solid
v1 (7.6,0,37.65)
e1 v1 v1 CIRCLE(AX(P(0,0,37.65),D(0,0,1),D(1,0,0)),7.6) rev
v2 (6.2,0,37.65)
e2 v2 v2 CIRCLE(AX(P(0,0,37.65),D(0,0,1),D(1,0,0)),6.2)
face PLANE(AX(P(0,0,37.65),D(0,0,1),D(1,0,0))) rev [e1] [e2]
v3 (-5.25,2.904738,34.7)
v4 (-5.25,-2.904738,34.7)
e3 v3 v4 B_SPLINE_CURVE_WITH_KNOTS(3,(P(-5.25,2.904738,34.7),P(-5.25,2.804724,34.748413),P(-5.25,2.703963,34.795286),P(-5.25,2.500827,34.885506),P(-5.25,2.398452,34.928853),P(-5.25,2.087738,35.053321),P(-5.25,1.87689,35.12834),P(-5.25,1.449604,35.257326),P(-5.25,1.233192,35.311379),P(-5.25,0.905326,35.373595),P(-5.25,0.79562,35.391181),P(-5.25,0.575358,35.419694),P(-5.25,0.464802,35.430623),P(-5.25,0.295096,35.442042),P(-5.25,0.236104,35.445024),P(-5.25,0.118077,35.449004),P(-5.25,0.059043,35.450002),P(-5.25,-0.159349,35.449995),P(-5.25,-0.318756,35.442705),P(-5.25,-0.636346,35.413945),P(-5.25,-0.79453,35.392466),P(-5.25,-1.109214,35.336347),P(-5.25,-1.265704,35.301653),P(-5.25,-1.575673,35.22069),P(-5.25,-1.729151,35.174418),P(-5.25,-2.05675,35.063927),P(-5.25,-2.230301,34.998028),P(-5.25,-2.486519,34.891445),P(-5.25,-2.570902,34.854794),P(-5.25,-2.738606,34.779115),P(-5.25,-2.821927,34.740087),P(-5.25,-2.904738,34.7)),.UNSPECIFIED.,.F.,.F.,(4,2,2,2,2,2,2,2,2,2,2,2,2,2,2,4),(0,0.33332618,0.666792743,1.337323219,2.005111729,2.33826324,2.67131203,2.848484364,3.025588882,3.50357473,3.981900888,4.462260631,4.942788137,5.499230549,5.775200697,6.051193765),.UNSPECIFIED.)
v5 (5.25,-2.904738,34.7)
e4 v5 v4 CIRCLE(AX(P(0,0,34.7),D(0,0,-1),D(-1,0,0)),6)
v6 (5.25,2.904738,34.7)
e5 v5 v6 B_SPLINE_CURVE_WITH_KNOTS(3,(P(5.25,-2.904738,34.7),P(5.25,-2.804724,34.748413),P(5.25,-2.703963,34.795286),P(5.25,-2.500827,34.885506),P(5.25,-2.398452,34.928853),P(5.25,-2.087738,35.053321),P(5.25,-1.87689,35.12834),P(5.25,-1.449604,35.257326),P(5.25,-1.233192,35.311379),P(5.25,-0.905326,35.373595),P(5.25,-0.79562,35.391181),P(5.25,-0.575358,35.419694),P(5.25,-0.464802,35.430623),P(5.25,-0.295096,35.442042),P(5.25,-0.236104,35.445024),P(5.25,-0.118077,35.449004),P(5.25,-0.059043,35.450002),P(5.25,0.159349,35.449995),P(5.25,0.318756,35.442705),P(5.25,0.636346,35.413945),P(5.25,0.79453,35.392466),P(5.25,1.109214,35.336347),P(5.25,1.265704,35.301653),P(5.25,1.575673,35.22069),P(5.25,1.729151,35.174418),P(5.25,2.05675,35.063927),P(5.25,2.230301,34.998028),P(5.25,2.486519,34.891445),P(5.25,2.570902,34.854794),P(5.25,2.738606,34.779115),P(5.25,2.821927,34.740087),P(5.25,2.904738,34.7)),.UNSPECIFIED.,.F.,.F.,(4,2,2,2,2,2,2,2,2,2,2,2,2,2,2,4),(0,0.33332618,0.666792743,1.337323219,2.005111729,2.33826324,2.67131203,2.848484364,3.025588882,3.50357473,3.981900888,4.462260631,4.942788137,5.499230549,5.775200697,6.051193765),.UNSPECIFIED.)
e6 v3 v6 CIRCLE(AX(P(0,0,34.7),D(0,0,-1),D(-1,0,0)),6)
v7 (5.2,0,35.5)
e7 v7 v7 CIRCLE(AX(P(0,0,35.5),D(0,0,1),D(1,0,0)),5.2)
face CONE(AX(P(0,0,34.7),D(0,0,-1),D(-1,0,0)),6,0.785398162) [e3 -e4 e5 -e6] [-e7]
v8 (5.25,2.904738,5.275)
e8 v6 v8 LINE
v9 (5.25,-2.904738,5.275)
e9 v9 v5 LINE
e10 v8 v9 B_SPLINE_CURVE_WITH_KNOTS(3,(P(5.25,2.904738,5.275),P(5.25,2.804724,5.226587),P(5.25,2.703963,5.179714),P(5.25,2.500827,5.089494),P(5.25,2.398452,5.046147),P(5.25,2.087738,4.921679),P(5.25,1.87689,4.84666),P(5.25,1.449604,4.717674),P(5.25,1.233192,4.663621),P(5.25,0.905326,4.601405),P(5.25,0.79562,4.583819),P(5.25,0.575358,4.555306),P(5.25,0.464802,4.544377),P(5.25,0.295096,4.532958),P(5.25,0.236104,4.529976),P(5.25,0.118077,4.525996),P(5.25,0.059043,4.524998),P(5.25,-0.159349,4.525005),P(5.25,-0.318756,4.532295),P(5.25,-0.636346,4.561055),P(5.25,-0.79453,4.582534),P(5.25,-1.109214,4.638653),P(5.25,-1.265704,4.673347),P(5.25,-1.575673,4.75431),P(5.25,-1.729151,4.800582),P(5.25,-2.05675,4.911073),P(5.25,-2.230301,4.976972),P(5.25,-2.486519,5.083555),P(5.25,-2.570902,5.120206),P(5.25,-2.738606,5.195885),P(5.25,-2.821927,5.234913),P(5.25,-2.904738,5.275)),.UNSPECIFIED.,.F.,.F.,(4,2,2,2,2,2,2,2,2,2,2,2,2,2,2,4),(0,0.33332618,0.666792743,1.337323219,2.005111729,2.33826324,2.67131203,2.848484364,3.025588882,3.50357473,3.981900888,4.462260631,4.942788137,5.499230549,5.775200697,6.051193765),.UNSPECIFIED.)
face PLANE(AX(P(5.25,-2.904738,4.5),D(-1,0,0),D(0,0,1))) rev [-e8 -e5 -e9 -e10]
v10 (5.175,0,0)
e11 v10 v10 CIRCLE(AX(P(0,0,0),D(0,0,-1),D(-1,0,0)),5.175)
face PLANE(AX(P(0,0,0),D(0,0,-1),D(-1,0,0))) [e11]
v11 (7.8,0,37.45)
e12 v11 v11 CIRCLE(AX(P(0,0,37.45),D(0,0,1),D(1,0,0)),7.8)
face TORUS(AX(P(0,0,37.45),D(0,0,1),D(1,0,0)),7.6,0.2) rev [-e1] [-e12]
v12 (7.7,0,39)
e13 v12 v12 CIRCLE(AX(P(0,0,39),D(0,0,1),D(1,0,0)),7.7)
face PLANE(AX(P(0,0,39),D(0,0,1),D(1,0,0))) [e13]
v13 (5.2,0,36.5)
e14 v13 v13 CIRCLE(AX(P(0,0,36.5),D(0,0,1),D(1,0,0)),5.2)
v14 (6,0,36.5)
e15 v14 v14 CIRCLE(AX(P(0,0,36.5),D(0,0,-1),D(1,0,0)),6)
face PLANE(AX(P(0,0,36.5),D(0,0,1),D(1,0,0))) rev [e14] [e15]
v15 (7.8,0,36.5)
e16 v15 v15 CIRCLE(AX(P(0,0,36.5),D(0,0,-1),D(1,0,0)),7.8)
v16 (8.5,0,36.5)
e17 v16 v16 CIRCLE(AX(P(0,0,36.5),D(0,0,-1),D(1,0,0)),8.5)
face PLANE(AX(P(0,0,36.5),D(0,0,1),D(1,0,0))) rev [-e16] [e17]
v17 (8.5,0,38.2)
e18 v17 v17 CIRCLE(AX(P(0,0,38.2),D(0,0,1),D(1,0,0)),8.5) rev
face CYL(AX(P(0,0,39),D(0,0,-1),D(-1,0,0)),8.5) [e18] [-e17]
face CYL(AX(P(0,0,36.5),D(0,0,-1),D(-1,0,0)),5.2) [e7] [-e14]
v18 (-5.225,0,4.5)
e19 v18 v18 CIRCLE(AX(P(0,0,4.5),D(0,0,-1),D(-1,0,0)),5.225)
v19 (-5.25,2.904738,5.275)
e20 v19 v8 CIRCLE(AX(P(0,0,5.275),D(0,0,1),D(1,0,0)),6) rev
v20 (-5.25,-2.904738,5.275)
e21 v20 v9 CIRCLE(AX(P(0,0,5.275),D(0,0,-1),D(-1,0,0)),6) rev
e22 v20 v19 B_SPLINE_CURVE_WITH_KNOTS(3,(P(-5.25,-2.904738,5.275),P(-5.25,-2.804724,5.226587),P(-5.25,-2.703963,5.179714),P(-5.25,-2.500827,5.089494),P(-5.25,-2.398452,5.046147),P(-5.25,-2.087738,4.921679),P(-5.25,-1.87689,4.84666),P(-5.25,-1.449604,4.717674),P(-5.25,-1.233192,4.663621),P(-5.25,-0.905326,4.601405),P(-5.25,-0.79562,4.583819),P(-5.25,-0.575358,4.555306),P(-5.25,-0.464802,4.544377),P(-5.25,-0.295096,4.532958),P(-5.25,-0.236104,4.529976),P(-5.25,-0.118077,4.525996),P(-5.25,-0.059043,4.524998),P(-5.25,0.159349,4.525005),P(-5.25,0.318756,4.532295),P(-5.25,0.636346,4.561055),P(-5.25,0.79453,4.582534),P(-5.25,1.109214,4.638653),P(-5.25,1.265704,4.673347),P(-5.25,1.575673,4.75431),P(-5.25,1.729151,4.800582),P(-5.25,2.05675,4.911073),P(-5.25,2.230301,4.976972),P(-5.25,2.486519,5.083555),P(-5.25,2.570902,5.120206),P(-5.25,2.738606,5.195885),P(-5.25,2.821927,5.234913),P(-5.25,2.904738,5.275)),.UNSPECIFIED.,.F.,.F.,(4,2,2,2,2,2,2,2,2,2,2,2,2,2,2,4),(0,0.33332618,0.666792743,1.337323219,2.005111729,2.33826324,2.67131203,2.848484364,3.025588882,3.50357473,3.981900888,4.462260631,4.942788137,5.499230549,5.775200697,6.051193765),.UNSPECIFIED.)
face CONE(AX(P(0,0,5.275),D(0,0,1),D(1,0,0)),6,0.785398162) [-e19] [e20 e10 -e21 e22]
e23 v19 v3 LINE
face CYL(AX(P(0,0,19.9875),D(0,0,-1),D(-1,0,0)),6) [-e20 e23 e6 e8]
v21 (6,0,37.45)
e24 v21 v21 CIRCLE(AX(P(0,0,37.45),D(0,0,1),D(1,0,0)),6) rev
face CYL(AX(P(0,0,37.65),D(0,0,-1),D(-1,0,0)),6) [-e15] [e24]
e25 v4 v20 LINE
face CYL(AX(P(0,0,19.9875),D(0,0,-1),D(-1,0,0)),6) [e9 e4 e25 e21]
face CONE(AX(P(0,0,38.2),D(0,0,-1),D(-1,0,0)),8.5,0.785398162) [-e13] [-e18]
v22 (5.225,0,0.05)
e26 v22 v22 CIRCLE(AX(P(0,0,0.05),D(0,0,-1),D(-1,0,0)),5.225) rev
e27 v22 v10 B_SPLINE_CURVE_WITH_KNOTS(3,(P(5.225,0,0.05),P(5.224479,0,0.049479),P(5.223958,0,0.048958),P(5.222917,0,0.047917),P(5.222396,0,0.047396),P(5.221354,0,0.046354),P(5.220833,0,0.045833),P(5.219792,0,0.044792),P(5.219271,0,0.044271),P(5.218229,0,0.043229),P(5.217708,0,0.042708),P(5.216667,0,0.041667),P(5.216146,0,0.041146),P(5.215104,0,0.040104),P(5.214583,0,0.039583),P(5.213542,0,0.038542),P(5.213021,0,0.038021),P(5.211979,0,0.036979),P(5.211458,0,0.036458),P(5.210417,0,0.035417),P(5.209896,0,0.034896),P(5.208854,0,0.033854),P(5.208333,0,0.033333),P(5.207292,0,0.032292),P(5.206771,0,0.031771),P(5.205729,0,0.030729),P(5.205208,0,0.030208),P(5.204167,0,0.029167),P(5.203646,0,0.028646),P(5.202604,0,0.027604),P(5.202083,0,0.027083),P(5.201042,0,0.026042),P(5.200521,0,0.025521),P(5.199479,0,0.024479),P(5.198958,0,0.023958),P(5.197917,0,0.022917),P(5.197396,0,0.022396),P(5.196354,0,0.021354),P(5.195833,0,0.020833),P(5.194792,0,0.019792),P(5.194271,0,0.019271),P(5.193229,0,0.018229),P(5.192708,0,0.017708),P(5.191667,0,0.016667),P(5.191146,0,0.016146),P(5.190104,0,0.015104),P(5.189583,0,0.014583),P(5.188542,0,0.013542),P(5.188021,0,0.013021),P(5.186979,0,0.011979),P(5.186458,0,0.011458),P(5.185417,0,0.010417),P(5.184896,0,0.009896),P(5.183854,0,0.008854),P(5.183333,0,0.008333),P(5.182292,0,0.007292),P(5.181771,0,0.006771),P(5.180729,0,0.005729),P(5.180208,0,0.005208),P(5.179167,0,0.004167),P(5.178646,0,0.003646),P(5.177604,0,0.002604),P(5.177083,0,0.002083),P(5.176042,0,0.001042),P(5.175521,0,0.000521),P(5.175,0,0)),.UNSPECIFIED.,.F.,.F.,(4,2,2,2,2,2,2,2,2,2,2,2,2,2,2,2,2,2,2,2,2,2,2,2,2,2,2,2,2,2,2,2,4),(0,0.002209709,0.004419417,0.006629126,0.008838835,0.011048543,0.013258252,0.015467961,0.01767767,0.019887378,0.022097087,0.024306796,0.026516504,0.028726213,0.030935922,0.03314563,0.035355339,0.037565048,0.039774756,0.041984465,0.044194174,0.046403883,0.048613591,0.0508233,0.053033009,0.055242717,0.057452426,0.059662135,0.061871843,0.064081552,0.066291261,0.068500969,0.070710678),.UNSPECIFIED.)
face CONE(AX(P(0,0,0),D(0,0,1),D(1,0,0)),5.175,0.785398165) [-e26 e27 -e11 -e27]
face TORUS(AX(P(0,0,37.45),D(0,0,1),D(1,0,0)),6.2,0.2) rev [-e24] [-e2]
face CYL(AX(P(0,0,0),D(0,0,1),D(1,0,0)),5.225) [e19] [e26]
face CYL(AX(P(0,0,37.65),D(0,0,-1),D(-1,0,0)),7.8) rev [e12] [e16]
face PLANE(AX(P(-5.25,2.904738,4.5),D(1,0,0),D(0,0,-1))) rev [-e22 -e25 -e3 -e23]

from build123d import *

# Parameters (mm, degrees)
BOSS_EXTRUDE1_START       = 4.524999897
BOSS_EXTRUDE1_2_OUTLINE_R = 5.225
BOSS_EXTRUDE1_2_DEPTH     = 30.925000207
SKETCH2_R                 = 8.5
BOSS_EXTRUDE2_DEPTH       = 2.5
SKETCH3_R                 = 7.8
SKETCH3_R_2               = 6
CUT_EXTRUDE1_DEPTH        = 1.15
SKETCH4_R                 = 5.225
BOSS_EXTRUDE3_DEPTH       = 4.5
CHAMFER1_SIZE             = 0.05
CHAMFER2_SIZE             = 0.799999999
CHAMFER2_SIZE2            = 0.800000001
FILLET1_R                 = 0.2


with BuildPart() as part:
    # Boss-Extrude1: read off the stored shape, not the designer's step
    # Boss-Extrude1 outline → Boss-Extrude1 (revolve)
    with BuildSketch(Plane.XZ):
        Polygon((5.225, 4.499999999), (5.225, 35.475000001), (5.2, 35.500000001), (5.2, 36.5), (0, 36.5), (0, 4.499999999), align=None)
    revolve(axis=Axis((0, 0, 0), (0, 0, 1)))

    # Boss-Extrude1 2 outline → Boss-Extrude1 2 (add)
    with BuildSketch(Plane.XY.offset(BOSS_EXTRUDE1_START)):
        with BuildLine():
            ThreePointArc((5.25, 2.904737509), (0, 6), (-5.25, 2.904737509))
            Line((-5.25, 2.904737509), (-5.25, -2.90473751))
            ThreePointArc((-5.25, -2.90473751), (0, -6), (5.25, -2.90473751))
            Line((5.25, -2.90473751), (5.25, 2.904737509))
        make_face()
        Circle(BOSS_EXTRUDE1_2_OUTLINE_R, mode=Mode.SUBTRACT)
    extrude(amount=BOSS_EXTRUDE1_2_DEPTH)

    # Boss-Extrude1 3 outline → Boss-Extrude1 3 (revolve, cut)
    with BuildSketch(Plane.XZ):
        Polygon((6, 5.275000001), (5.249999898, 4.524999897), (6, 4.524999897), align=None)
        Polygon((5.249999897, 35.450000104), (6, 34.699999999), (6, 35.450000104), align=None)
    revolve(axis=Axis((0, 0, 0), (0, 0, 1)), mode=Mode.SUBTRACT)

    # Boss-Extrude1 4 outline → Boss-Extrude1 4 (revolve)
    with BuildSketch(Plane.XZ):
        Polygon((5.225, 4.524999897), (5.225, 4.499999999), (5.249999898, 4.524999897), align=None)
        Polygon((5.225, 35.450000104), (5.249999897, 35.450000104), (5.225, 35.475000001), align=None)
    revolve(axis=Axis((0, 0, 0), (0, 0, 1)))

    # Sketch2 → Boss-Extrude2 (add)
    with BuildSketch(Plane(origin=(0, 0, 36.5), x_dir=(-1, 0, 0), z_dir=(0, 0, -1))):
        with Locations(Location((0, 0, 0), (0, 0, 180))):
            Circle(SKETCH2_R)
    extrude(amount=-BOSS_EXTRUDE2_DEPTH)

    # Sketch3 → Cut-Extrude1 (cut)
    with BuildSketch(Plane(origin=(0, 0, 36.5), x_dir=(-1, 0, 0), z_dir=(0, 0, -1))):
        with Locations(Location((0, 0, 0), (0, 0, 180))):
            Circle(SKETCH3_R)
        with Locations(Location((0, 0, 0), (0, 0, 180))):
            Circle(SKETCH3_R_2, mode=Mode.SUBTRACT)
    extrude(amount=-CUT_EXTRUDE1_DEPTH, mode=Mode.SUBTRACT)

    # Sketch4 → Boss-Extrude3 (add)
    with BuildSketch(Plane(origin=(0, 0, 4.5), x_dir=(-1, 0, 0), z_dir=(0, 0, -1))):
        Circle(SKETCH4_R)
    extrude(amount=BOSS_EXTRUDE3_DEPTH)

    # Chamfer1
    chamfer1_edges = [part.edges().sort_by_distance(p)[0] for p in [
        (5.225, 0, 0),
    ]]
    chamfer(chamfer1_edges, length=CHAMFER1_SIZE)

    # Chamfer2
    chamfer2_edges = [part.edges().sort_by_distance(p)[0] for p in [
        (-8.5, 0, 39),
    ]]
    chamfer2_side = [part.faces().sort_by_distance(p)[0] for p in [
        (-8.5, 0, 37.75),
    ]]
    chamfer(chamfer2_edges, length=CHAMFER2_SIZE, length2=CHAMFER2_SIZE2, reference=chamfer2_side[0])

    # Fillet1
    fillet1_edges = [part.edges().sort_by_distance(p)[0] for p in [
        (-7.8, 0, 37.65),
        (-6, 0, 37.65),
    ]]
    fillet(fillet1_edges, radius=FILLET1_R)


solid = part.part
